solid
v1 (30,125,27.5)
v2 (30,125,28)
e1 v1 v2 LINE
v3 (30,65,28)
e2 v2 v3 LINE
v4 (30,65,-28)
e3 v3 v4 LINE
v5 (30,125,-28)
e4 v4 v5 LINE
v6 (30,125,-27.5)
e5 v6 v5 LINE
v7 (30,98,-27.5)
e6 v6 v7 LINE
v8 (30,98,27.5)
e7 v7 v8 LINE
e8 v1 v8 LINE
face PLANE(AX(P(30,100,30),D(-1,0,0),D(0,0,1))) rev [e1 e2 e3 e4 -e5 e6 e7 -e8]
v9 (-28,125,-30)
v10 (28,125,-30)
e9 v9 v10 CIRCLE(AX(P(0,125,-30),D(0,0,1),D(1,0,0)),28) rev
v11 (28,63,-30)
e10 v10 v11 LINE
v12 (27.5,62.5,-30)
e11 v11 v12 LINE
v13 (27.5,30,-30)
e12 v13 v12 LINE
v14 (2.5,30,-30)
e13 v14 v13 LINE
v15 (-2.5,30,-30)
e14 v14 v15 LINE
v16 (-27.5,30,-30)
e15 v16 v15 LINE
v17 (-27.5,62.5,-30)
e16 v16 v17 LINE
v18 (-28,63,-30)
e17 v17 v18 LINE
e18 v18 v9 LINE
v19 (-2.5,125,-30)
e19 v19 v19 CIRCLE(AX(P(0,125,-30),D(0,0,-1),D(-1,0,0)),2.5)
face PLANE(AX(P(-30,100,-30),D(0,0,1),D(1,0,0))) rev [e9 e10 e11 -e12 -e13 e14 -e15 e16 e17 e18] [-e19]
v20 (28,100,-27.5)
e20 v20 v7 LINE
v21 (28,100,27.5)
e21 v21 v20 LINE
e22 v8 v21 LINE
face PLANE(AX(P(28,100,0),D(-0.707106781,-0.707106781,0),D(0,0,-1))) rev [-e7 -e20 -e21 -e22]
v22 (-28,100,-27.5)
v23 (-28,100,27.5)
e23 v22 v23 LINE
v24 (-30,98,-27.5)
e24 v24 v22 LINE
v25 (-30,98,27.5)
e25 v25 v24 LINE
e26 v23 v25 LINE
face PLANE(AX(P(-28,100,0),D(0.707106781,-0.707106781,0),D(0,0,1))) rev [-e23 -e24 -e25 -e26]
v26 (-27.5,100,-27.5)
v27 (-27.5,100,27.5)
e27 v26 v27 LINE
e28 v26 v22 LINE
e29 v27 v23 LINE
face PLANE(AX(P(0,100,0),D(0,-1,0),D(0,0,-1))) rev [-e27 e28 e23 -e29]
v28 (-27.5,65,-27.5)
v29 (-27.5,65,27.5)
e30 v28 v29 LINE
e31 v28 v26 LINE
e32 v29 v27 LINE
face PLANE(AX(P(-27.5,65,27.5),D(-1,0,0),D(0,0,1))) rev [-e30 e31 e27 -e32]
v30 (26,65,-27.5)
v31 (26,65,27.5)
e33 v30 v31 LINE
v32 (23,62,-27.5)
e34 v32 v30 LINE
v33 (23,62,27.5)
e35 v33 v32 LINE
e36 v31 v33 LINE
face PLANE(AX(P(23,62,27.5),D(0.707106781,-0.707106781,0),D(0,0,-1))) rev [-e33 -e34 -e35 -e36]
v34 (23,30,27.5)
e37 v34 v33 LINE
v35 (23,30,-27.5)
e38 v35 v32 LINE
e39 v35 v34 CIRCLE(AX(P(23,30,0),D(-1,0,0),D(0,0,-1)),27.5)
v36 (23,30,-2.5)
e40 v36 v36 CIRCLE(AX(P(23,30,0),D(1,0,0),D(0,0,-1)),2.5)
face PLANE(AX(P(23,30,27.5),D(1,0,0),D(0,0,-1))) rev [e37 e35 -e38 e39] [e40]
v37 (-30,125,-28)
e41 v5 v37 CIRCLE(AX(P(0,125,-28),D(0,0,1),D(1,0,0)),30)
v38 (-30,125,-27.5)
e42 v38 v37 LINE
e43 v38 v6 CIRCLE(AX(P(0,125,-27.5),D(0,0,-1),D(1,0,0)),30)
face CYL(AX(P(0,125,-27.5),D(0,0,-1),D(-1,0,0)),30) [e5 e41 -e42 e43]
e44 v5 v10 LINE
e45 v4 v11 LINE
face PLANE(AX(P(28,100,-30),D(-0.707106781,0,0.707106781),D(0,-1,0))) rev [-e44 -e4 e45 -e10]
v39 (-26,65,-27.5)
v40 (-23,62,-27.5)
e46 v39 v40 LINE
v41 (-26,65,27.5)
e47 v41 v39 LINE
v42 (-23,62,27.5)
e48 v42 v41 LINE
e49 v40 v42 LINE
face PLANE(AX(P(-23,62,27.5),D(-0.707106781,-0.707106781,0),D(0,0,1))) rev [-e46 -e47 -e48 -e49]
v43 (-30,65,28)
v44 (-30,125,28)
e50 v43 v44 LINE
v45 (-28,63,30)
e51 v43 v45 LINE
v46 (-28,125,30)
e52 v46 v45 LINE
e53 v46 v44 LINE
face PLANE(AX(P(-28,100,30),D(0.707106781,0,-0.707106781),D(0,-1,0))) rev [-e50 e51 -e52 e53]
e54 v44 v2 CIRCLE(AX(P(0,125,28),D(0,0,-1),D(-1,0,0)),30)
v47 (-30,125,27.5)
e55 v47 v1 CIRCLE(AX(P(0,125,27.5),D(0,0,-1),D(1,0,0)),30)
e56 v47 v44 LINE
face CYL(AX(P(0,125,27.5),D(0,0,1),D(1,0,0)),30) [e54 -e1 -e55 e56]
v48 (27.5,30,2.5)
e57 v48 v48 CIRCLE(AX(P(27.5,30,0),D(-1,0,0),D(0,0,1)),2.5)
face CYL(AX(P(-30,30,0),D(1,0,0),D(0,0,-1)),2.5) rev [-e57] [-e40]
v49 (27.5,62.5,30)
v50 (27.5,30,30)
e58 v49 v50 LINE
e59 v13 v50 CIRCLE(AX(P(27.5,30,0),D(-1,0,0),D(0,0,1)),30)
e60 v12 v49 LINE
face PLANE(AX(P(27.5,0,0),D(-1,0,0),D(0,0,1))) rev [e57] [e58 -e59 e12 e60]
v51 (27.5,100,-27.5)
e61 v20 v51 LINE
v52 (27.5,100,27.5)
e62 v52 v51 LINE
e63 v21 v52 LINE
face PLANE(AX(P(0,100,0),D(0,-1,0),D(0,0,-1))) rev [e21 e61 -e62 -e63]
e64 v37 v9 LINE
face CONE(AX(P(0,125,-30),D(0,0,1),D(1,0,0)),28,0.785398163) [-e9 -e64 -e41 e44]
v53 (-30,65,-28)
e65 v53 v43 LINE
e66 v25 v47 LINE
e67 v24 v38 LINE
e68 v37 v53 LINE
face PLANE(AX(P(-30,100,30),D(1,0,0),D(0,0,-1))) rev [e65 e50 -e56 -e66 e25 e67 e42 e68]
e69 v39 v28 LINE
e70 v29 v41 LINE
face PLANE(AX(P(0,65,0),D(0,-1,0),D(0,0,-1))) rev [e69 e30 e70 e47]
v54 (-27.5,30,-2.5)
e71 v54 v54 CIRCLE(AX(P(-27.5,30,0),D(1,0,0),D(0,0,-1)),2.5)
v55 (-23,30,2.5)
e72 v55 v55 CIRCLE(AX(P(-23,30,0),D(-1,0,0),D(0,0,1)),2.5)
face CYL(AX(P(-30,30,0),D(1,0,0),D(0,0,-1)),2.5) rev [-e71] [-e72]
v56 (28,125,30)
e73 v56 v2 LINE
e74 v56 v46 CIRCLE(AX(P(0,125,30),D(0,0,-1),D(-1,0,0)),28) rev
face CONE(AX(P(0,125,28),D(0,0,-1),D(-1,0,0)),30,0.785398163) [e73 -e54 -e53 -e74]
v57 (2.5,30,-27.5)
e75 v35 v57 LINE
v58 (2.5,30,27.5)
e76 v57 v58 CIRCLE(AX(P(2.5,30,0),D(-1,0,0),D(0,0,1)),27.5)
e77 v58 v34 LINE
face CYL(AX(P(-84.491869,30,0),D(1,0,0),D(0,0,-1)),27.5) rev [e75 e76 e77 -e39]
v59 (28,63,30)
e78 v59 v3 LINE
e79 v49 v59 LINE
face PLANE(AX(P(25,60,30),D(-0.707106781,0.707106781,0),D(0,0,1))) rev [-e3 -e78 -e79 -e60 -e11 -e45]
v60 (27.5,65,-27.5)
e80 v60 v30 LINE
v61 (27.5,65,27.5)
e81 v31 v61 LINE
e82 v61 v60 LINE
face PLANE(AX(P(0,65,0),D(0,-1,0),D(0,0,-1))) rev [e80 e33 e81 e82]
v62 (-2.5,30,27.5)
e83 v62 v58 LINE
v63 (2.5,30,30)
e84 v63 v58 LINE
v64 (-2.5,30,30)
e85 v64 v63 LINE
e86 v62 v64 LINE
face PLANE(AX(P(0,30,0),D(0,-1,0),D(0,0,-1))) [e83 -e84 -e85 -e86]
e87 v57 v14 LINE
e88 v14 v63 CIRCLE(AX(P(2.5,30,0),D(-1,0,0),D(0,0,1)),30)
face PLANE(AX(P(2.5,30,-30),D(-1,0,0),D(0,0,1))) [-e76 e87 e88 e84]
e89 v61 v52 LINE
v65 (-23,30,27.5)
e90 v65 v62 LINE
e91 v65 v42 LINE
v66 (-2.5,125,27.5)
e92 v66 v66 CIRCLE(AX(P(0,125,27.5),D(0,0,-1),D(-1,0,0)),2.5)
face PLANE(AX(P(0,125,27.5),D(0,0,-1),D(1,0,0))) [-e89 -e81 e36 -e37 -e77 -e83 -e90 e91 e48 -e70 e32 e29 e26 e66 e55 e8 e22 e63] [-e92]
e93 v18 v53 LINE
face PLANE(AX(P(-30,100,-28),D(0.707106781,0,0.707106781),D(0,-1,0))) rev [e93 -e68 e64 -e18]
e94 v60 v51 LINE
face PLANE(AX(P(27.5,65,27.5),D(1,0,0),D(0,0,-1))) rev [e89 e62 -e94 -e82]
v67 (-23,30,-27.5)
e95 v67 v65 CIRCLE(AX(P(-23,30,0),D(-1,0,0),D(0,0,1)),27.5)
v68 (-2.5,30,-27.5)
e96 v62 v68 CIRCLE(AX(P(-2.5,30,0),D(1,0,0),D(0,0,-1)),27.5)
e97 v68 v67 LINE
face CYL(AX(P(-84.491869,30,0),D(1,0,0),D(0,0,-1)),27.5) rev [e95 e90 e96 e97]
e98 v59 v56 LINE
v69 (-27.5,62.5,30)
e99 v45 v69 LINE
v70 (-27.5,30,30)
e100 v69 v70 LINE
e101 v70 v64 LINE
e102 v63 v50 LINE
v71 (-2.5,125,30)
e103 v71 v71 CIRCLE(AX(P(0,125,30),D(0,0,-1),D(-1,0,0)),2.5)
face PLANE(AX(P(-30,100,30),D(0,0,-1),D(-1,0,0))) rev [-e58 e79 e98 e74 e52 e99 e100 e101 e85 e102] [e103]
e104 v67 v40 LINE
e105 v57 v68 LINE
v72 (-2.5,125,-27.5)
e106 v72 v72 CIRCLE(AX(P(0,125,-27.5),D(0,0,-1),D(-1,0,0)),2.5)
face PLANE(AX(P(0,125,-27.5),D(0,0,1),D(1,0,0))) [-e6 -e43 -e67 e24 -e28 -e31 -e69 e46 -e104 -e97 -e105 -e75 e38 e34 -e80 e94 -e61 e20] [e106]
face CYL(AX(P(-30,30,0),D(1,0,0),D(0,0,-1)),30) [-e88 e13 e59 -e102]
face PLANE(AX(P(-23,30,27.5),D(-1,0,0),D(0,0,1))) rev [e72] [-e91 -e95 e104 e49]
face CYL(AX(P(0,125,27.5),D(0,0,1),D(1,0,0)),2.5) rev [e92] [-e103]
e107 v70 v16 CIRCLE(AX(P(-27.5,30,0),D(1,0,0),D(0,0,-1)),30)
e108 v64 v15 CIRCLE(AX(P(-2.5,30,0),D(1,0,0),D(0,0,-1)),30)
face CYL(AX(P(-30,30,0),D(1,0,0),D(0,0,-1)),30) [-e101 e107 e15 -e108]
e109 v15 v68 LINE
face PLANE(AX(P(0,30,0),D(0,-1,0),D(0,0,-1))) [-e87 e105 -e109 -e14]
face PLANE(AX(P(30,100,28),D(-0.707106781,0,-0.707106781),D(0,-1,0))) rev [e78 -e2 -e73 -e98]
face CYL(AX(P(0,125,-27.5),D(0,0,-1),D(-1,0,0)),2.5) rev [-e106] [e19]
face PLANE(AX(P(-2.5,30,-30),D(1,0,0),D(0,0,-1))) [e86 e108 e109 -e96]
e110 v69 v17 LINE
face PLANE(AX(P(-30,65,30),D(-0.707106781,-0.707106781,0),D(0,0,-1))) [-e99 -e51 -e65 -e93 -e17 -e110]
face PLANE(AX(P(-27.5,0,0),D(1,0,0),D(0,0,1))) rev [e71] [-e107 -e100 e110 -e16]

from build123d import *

# Parameters (mm, degrees)
SKETCH1_W               = 60
SKETCH1_H               = 60
BOSS_EXTRUDE1_DEPTH     = 100
SKETCH4_R               = 2.5
BOSS_EXTRUDE2_DEPTH     = 2.5
CUT_EXTRUDE1_DEPTH      = 169.893457541
CUT_EXTRUDE1_DEPTH_BACK = 169.893457541
SKETCH5_R               = 2.5
SKETCH6_W               = 60
SKETCH6_H               = 60
CUT_EXTRUDE2_DEPTH      = 2.5
CHAMFER1_SIZE           = 2
CHAMFER2_SIZE           = 5
SKETCH7_W               = 55
SKETCH7_H               = 55
CUT_EXTRUDE3_DEPTH      = 35
SKETCH8_W               = 46
SKETCH8_H               = 55
CUT_EXTRUDE4_DEPTH      = 35
CUT_EXTRUDE5_DEPTH      = 46
SKETCH10_W              = 5
SKETCH10_H              = 60
CUT_EXTRUDE6_DEPTH      = 30
CHAMFER3_SIZE           = 3


with BuildPart() as part:
    # Sketch1 → Boss-Extrude1 (new body)
    with BuildSketch(Plane(origin=(0, 0, 0), x_dir=(1, 0, 0), z_dir=(0, 1, 0))):
        Rectangle(SKETCH1_W, SKETCH1_H)
    extrude(amount=BOSS_EXTRUDE1_DEPTH)

    # Sketch4 → Boss-Extrude2 (add)
    with BuildSketch(Plane(origin=(0, 0, -30), x_dir=(-1, 0, 0), z_dir=(0, 0, -1))):
        with BuildLine():
            Line((-30, 100), (30, 100))
            Line((30, 100), (30, 125))
            ThreePointArc((30, 125), (0, 155), (-30, 125))
            Line((-30, 125), (-30, 100))
        make_face()
        with Locations((0, 125)):
            Circle(SKETCH4_R, mode=Mode.SUBTRACT)
    boss_extrude2 = extrude(amount=-BOSS_EXTRUDE2_DEPTH)

    # Mirror2: Boss-Extrude2 across plane
    add(boss_extrude2.mirror(Plane.XY))

    # Sketch5 → Cut-Extrude1 (cut, two sides: drawn at the far end of the back side and taken through both)
    with BuildSketch(Plane.ZY.offset(-30).offset(-CUT_EXTRUDE1_DEPTH_BACK)):
        with BuildLine():
            Line((-30, 0), (2.9e-08, 0))
            ThreePointArc((2.9e-08, 0), (-21.213203425, 8.786796554), (-30, 30))
            Line((-30, 30), (-30, 0))
        make_face()
        with BuildLine():
            Line((30, 0), (30, 30))
            ThreePointArc((30, 30), (21.213203446, 8.786796575), (2.9e-08, 0))
            Line((2.9e-08, 0), (30, 0))
        make_face()
        with Locations((0, 30)):
            Circle(SKETCH5_R)
    extrude(amount=CUT_EXTRUDE1_DEPTH + CUT_EXTRUDE1_DEPTH_BACK, mode=Mode.SUBTRACT)

    # Sketch6 → Cut-Extrude2 (cut)
    with BuildSketch(Plane(origin=(30, 0, 0), x_dir=(0, 0, -1), z_dir=(1, 0, 0))):
        with Locations((0, 30)):
            Rectangle(SKETCH6_W, SKETCH6_H)
    cut_extrude2 = extrude(amount=-CUT_EXTRUDE2_DEPTH, mode=Mode.SUBTRACT)

    # Mirror3: Cut-Extrude2 across plane
    add(cut_extrude2.mirror(Plane(origin=(0, 0, 0), x_dir=(0, 0, 1), z_dir=(1, 0, 0))), mode=Mode.SUBTRACT)

    # Chamfer1
    chamfer1_edges = [part.edges().sort_by_distance(p)[0] for p in [
        (-30, 100, 0),
        (0, 155, -30),
        (30, 100, 0),
        (0, 155, 30),
        (30, 92.5, 30),
        (-30, 92.5, 30),
        (-30, 92.5, -30),
        (30, 92.5, -30),
    ]]
    chamfer(chamfer1_edges, length=CHAMFER1_SIZE)

    # Chamfer2
    # the kernel refuses this chamfer: 5 mm, written as the material it takes off along each edge
    with BuildSketch(Plane(origin=(30, 60, 40.85841494), x_dir=(0.027495876610586282, 0.9996219169112968, 0), z_dir=(0, 0, -1))) as chamfer2_piece_1_section:
        Polygon((CHAMFER2_SIZE * 0.999621916911, -CHAMFER2_SIZE * 0.0274958766106), (-CHAMFER2_SIZE * 0.0274958766106, -CHAMFER2_SIZE * 0.999621916911), (0, 0), align=None)
    chamfer2_piece_1 = extrude(amount=81.71682988, mode=Mode.PRIVATE)
    chamfer2_piece_1 = split(chamfer2_piece_1, bisect_by=Plane(origin=(27.5, 61.967005421, 0), z_dir=(1, 0, 0)), keep=Keep.TOP, mode=Mode.PRIVATE)
    add(chamfer2_piece_1, mode=Mode.SUBTRACT)
    with BuildSketch(Plane(origin=(-30, 60, 40.85841494), x_dir=(-0.027495876610586282, 0.9996219169112968, 0), z_dir=(0, 0, -1))) as chamfer2_piece_2_section:
        Polygon((CHAMFER2_SIZE * 0.999621916911, CHAMFER2_SIZE * 0.0274958766106), (-CHAMFER2_SIZE * 0.0274958766106, CHAMFER2_SIZE * 0.999621916911), (0, 0), align=None)
    chamfer2_piece_2 = extrude(amount=81.71682988, mode=Mode.PRIVATE)
    chamfer2_piece_2 = split(chamfer2_piece_2, bisect_by=Plane(origin=(-27.5, 61.967005421, 0), z_dir=(-1, 0, 0)), keep=Keep.TOP, mode=Mode.PRIVATE)
    add(chamfer2_piece_2, mode=Mode.SUBTRACT)

    # Sketch7 → Cut-Extrude3 (cut)
    with BuildSketch(Plane(origin=(0, 100, 0), x_dir=(1, 0, 0), z_dir=(0, 1, 0))):
        Rectangle(SKETCH7_W, SKETCH7_H)
    extrude(amount=-CUT_EXTRUDE3_DEPTH, mode=Mode.SUBTRACT)

    # Sketch8 → Cut-Extrude4 (cut)
    with BuildSketch(Plane(origin=(0, 65, 0), x_dir=(1, 0, 0), z_dir=(0, 1, 0))):
        Rectangle(SKETCH8_W, SKETCH8_H)
    extrude(amount=-CUT_EXTRUDE4_DEPTH, mode=Mode.SUBTRACT)

    # Sketch9 → Cut-Extrude5 (cut)
    with BuildSketch(Plane.ZY.offset(-23)):
        with BuildLine():
            Line((-27.5, 30), (27.5, 30))
            ThreePointArc((27.5, 30), (0, 2.5), (-27.5, 30))
        make_face()
    extrude(amount=CUT_EXTRUDE5_DEPTH, mode=Mode.SUBTRACT)

    # Sketch10 → Cut-Extrude6 (cut)
    with BuildSketch(Plane(origin=(0, 0, 0), x_dir=(1, 0, 0), z_dir=(0, 1, 0))):
        Rectangle(SKETCH10_W, SKETCH10_H)
    extrude(amount=CUT_EXTRUDE6_DEPTH, mode=Mode.SUBTRACT)

    # Chamfer3
    chamfer3_edges = [part.edges().sort_by_distance(p)[0] for p in [
        (23, 65, 0),
        (-23, 65, 0),
    ]]
    chamfer(chamfer3_edges, length=CHAMFER3_SIZE)


solid = part.part
